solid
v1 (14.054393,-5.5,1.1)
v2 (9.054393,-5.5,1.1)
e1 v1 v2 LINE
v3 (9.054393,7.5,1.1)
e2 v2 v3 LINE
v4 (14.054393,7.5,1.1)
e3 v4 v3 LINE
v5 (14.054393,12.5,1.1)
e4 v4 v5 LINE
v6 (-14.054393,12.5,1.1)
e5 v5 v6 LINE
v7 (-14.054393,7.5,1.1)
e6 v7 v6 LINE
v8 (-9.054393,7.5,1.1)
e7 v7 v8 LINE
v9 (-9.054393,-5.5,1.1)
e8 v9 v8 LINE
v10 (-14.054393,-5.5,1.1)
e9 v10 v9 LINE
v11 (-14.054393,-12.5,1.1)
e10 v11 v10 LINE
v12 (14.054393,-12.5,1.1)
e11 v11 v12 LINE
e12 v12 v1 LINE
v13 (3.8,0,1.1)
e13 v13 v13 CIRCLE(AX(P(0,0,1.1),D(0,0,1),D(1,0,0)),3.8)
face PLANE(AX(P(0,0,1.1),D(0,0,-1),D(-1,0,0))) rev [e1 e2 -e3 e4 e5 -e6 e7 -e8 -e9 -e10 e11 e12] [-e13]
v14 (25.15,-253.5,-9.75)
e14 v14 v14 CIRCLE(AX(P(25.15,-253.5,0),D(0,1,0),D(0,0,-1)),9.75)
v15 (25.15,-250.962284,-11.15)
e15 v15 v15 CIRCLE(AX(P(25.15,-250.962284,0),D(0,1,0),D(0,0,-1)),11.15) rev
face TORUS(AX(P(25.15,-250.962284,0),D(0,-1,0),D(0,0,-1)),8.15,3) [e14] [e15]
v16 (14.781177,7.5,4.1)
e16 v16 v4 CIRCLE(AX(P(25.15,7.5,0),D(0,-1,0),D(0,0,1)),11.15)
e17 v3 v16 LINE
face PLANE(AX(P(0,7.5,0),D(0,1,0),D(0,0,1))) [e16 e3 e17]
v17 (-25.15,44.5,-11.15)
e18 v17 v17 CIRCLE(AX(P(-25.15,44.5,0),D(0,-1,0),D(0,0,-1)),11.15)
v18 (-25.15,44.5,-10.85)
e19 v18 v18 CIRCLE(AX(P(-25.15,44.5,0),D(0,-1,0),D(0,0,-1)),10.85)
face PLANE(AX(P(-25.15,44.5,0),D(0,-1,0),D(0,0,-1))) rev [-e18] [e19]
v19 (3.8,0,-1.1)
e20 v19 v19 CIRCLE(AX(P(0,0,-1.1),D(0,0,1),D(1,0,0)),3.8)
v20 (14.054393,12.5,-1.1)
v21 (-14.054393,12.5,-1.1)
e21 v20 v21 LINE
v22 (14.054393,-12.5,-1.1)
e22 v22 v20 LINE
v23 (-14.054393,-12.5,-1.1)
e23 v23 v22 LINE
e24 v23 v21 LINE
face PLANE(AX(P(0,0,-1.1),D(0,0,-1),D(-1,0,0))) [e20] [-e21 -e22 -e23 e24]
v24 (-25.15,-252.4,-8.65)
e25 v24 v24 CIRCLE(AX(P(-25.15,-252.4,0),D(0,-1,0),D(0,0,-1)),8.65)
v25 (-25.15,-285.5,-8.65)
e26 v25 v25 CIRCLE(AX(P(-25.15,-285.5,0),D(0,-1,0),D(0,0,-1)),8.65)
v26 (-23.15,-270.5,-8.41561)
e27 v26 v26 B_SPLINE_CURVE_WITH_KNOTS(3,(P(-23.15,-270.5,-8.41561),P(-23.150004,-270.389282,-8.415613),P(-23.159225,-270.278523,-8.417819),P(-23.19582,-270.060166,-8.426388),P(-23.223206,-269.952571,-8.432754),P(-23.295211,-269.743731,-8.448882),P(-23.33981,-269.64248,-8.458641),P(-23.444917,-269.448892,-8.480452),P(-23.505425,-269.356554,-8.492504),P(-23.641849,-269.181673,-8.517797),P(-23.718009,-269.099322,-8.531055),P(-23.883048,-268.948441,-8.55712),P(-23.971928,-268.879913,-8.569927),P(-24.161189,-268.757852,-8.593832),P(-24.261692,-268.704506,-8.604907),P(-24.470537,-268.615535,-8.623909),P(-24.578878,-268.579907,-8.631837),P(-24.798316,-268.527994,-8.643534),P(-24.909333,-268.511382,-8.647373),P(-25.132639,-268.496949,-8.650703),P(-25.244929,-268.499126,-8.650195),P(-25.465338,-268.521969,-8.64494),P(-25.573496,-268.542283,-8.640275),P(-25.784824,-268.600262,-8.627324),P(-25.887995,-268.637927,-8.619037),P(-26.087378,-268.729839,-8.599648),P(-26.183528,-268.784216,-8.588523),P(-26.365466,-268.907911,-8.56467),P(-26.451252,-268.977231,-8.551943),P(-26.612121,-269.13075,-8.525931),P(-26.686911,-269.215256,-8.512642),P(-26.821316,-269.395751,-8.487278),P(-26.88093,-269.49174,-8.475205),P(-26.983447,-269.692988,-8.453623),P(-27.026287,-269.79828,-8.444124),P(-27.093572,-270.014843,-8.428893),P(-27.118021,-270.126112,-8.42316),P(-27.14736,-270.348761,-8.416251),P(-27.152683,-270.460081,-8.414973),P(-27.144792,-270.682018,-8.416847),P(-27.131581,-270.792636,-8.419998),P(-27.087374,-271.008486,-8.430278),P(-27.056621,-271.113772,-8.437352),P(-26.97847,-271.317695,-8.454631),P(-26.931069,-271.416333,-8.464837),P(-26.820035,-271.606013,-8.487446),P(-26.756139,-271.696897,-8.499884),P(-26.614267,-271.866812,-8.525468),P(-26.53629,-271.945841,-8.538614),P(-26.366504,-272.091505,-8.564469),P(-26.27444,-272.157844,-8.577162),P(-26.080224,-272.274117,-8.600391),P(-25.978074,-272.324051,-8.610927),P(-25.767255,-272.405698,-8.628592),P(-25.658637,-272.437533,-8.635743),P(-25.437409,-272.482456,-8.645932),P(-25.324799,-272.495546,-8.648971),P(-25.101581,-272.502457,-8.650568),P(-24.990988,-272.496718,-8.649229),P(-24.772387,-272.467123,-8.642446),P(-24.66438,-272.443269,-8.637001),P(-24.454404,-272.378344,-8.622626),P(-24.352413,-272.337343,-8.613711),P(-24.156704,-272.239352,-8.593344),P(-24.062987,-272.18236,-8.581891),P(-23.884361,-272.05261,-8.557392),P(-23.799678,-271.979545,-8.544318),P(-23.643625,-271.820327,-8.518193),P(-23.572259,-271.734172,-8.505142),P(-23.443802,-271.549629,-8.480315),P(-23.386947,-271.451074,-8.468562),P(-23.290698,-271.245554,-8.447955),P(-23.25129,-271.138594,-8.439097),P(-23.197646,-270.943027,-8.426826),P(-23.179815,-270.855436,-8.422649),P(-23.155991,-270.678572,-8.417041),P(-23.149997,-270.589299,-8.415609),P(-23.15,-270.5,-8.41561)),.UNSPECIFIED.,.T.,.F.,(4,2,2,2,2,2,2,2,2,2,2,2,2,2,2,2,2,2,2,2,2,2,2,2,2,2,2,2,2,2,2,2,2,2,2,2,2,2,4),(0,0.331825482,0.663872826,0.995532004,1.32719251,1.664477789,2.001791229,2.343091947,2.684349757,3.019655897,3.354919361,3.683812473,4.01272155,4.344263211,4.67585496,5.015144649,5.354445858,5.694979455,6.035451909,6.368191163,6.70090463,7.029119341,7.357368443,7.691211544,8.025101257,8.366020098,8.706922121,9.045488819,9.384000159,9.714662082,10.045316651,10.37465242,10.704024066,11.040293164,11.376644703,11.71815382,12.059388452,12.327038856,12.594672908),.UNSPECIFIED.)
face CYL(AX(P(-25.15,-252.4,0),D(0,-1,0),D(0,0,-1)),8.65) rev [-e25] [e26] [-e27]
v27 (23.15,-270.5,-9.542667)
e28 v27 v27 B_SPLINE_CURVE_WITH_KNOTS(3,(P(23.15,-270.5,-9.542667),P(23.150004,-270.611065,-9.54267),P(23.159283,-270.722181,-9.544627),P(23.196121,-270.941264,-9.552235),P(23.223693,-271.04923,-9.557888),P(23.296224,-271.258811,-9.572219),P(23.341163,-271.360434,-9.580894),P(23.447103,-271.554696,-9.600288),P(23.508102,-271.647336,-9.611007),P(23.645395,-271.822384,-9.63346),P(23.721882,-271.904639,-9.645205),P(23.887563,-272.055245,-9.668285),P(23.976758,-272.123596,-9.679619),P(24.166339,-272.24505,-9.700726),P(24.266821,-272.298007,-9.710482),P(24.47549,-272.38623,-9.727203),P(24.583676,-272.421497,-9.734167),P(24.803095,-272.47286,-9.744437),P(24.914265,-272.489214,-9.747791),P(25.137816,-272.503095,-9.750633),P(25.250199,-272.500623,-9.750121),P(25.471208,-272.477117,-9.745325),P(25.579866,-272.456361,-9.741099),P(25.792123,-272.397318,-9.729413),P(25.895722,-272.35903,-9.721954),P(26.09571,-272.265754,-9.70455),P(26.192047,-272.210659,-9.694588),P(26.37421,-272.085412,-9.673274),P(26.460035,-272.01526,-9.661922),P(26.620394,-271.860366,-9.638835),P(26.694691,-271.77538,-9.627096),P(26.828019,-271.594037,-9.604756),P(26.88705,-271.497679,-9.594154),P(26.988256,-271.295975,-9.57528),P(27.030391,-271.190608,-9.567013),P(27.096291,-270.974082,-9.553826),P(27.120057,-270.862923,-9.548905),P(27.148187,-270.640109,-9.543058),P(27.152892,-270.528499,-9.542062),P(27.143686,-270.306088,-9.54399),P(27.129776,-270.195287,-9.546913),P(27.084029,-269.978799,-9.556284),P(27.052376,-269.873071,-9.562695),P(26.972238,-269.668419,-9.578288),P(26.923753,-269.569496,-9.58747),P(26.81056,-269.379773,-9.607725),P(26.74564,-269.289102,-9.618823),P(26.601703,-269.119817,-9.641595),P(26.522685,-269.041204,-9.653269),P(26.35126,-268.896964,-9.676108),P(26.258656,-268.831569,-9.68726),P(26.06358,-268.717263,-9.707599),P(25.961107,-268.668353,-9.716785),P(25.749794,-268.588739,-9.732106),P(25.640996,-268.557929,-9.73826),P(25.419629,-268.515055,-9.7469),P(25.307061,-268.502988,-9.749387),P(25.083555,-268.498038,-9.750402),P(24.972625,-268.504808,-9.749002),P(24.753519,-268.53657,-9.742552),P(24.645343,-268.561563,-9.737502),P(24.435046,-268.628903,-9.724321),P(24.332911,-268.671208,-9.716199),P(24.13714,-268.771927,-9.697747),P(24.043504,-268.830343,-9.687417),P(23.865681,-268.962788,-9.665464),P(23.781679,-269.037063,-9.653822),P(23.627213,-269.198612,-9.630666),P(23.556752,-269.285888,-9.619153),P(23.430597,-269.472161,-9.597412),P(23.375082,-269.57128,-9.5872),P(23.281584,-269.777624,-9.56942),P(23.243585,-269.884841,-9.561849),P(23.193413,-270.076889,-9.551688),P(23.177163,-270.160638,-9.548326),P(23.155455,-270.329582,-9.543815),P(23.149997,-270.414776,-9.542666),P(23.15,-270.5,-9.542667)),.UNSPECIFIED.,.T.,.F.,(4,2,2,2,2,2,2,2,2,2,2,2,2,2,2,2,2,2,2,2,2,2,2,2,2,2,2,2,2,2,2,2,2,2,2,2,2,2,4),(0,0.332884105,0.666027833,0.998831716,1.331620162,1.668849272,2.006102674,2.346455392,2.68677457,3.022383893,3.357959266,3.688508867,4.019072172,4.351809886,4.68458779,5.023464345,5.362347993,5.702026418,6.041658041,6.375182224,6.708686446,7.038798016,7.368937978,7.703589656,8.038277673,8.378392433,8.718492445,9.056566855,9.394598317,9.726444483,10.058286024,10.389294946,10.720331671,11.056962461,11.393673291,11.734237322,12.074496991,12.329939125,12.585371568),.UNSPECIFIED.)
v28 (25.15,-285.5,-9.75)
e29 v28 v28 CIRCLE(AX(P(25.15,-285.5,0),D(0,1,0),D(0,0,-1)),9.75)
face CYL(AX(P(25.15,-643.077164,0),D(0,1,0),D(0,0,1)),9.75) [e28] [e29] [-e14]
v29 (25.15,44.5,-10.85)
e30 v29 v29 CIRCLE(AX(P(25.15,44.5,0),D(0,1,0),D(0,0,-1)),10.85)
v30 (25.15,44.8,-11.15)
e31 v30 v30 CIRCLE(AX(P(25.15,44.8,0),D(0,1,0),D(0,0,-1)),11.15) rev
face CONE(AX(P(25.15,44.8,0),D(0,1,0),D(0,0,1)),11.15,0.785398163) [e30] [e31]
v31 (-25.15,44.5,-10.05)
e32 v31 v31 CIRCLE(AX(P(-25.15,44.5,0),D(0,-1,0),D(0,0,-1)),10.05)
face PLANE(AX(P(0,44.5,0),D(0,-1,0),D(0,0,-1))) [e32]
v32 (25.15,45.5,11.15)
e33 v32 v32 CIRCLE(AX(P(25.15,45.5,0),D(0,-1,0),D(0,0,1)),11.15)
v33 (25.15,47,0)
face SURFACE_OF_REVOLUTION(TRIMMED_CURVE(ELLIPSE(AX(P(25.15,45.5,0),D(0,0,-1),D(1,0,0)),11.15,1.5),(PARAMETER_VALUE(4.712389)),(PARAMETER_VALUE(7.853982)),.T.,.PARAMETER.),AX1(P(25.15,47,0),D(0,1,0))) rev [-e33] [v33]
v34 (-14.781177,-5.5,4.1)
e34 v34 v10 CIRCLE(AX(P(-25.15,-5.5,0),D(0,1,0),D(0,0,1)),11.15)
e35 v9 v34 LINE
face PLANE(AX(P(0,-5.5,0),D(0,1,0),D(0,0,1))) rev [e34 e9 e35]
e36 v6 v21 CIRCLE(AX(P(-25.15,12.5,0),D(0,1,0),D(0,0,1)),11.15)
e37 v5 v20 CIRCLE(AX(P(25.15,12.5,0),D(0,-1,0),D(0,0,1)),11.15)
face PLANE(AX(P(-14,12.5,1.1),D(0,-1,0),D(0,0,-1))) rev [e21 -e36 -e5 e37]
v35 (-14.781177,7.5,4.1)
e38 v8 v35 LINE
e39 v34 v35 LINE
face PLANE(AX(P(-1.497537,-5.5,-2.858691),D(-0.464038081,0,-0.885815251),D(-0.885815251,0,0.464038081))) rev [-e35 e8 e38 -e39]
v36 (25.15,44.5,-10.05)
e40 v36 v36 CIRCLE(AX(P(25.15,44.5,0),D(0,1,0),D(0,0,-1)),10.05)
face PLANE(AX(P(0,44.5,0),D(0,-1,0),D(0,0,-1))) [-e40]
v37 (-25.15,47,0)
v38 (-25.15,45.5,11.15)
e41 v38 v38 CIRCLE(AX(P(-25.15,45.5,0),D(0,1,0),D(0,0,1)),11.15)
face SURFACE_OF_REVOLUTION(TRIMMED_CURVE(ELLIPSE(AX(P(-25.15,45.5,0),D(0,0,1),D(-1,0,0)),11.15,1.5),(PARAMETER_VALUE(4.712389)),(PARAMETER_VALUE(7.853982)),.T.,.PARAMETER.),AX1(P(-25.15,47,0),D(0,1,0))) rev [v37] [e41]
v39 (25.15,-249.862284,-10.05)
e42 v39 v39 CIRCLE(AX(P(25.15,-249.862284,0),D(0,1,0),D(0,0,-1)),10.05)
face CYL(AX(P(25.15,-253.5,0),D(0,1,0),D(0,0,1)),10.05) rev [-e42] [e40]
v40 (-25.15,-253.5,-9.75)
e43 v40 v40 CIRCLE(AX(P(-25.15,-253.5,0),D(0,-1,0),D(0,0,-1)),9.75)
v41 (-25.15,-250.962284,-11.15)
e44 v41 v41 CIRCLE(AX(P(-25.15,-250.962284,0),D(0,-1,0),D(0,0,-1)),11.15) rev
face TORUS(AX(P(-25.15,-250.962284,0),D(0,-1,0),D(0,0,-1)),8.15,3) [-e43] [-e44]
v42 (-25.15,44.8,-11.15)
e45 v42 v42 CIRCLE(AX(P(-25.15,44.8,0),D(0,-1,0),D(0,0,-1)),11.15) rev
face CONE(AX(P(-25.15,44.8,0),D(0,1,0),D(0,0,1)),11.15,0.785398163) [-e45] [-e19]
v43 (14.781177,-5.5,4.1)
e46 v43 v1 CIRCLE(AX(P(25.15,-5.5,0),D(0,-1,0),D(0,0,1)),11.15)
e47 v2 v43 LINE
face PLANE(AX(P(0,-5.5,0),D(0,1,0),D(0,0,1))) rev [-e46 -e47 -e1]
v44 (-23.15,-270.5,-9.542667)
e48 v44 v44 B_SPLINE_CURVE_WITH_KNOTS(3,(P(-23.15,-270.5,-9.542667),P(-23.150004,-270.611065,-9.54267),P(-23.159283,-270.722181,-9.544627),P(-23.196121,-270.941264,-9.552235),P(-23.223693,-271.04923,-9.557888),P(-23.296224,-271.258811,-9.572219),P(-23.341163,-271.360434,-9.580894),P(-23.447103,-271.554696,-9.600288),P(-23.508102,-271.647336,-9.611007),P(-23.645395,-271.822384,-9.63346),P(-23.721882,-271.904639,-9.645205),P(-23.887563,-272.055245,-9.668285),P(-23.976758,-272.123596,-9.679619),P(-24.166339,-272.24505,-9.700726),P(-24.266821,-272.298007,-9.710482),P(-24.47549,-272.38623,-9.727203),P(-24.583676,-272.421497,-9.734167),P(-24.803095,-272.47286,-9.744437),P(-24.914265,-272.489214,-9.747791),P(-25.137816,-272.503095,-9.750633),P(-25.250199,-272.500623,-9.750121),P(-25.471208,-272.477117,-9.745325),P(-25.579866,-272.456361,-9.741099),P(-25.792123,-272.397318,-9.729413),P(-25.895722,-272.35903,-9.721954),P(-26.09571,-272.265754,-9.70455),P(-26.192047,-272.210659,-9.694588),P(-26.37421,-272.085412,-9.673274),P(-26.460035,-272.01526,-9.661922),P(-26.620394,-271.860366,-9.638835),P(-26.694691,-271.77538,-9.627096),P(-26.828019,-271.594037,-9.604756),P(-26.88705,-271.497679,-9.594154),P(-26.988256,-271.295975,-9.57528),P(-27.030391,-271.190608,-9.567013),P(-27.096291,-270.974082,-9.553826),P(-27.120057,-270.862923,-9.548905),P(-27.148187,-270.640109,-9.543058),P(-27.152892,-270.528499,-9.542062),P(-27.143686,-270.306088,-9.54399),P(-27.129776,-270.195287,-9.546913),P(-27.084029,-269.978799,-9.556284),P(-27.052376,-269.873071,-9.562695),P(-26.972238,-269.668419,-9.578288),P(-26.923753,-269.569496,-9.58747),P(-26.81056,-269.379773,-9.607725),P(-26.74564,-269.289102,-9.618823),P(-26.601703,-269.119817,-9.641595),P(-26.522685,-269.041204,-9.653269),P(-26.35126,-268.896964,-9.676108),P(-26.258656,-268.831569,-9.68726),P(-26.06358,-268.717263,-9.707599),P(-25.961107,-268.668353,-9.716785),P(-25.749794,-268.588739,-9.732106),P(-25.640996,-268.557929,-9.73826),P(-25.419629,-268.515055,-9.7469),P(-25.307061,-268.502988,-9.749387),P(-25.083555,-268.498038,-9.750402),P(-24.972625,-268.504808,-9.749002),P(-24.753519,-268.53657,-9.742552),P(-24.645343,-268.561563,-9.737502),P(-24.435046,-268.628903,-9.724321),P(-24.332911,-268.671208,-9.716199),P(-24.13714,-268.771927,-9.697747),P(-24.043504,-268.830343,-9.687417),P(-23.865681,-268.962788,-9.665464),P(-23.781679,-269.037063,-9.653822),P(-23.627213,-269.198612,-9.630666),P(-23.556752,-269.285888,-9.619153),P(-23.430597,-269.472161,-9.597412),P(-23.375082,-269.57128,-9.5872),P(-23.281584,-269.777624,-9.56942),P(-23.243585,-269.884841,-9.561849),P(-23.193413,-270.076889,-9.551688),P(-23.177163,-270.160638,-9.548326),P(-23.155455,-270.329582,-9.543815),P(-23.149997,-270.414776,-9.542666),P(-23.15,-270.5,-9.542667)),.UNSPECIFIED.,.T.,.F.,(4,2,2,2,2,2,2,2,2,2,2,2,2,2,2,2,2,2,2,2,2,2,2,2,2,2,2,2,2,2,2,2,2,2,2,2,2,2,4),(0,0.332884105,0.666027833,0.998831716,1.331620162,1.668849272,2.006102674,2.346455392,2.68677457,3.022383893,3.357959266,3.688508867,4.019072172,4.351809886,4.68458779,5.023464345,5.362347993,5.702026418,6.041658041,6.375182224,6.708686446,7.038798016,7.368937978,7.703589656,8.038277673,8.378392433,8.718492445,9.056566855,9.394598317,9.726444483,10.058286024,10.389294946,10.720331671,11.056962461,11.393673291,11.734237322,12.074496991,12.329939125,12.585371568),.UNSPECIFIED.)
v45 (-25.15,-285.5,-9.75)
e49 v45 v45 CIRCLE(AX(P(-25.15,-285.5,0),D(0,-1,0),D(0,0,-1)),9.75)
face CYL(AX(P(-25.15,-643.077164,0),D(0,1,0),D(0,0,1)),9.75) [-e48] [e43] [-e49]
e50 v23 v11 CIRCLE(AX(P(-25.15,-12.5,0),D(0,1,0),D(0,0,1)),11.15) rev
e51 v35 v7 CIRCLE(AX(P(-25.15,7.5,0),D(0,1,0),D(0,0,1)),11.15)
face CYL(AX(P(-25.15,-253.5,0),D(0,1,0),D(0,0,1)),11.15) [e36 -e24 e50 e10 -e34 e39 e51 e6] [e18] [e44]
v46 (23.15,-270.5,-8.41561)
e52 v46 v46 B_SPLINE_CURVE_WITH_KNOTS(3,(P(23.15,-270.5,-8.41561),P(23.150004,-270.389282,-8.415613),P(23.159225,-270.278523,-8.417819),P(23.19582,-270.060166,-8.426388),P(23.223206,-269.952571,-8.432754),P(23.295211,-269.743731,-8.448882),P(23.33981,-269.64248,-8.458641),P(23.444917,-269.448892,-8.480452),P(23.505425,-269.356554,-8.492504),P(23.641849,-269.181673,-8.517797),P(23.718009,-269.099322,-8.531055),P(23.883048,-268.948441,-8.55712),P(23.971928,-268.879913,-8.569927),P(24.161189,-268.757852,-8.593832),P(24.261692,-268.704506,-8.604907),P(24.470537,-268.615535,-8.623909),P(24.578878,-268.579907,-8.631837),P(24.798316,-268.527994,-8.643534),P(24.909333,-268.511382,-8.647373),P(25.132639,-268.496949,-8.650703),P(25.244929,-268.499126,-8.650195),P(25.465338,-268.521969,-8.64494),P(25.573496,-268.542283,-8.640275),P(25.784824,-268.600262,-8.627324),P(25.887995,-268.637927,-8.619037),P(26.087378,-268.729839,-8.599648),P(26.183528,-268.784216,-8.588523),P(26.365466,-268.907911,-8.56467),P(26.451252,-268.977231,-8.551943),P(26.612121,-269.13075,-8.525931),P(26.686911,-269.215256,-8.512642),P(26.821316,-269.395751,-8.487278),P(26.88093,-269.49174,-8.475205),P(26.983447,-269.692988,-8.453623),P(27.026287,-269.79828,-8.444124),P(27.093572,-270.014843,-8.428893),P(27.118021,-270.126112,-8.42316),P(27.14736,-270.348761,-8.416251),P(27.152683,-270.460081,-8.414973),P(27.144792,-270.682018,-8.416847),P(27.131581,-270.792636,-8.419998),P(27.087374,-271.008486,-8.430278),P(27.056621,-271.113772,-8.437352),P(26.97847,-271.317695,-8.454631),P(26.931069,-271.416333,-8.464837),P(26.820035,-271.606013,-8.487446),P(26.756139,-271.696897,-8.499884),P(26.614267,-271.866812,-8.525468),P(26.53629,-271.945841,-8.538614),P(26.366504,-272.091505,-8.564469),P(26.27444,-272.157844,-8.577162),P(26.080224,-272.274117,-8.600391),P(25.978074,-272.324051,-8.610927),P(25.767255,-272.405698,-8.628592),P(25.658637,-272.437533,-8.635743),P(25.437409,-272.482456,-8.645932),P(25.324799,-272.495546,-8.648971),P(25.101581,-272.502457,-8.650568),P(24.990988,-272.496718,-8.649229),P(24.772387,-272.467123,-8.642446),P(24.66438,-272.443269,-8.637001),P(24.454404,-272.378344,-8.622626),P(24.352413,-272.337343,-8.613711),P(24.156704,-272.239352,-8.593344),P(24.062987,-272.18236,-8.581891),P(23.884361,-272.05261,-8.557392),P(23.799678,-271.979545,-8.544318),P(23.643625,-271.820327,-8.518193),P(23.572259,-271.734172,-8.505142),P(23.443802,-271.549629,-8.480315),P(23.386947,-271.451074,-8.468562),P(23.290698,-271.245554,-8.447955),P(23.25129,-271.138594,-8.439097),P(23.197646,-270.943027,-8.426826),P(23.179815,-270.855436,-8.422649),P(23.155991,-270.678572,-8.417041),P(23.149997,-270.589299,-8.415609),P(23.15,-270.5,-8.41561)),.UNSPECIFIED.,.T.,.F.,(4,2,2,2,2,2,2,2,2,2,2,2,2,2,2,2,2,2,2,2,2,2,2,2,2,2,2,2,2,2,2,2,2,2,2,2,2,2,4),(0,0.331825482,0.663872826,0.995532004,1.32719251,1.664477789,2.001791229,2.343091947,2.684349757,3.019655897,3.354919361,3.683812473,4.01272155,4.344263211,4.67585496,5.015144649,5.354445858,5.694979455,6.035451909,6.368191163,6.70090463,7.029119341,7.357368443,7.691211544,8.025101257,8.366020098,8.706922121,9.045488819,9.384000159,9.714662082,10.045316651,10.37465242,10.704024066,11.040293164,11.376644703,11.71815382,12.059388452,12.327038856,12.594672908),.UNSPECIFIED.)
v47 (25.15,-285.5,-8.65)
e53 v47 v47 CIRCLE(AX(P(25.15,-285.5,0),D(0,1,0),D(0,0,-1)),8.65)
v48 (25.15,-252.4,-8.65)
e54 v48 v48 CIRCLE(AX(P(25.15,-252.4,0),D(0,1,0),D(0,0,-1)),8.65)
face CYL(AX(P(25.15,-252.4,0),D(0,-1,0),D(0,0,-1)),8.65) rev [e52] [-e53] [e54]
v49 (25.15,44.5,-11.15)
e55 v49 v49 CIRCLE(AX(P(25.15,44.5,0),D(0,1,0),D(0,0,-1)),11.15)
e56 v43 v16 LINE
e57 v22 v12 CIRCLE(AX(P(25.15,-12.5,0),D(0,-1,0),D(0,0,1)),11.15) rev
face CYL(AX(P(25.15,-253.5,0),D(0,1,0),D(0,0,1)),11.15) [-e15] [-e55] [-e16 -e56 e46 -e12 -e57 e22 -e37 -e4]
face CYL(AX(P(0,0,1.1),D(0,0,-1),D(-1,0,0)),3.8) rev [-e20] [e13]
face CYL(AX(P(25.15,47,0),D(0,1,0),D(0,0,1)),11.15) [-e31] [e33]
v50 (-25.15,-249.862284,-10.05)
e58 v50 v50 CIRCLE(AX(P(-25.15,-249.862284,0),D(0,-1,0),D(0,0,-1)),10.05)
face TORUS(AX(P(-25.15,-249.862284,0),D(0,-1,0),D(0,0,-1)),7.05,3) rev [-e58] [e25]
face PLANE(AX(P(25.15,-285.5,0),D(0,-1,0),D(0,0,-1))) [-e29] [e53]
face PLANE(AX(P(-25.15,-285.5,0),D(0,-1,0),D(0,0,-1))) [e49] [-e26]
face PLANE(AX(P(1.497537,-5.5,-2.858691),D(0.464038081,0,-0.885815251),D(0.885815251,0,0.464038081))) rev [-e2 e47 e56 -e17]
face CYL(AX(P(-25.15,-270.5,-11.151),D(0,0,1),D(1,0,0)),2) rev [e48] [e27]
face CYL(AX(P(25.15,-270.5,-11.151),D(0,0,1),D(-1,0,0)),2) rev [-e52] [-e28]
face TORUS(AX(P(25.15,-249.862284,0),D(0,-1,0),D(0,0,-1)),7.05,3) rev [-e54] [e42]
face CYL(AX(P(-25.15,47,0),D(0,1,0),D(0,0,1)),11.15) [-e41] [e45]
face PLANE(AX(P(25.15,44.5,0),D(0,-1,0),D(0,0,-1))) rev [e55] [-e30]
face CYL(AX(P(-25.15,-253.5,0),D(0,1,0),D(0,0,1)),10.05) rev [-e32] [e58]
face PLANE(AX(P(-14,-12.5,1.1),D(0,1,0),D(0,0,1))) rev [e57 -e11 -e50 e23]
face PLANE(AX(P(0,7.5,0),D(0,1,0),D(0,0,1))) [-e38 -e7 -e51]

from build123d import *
from build123d.topology import SkipClean

# Parameters (mm, degrees)
SKETCH1_W                = 28
SKETCH1_H                = 25
SKETCH1_R                = 3.8
BOSS_EXTRUDE1_DEPTH      = 1.1
BOSS_EXTRUDE2_DEPTH      = 241
BOSS_EXTRUDE2_DEPTH_BACK = 57
SKETCH2_R                = 11.15
SKETCH2_R_2              = 10.05
SKETCH3_R                = 11.15
SKETCH3_R_2              = 8.65
BOSS_EXTRUDE3_DEPTH      = 1.1
SKETCH4_R                = 9.75
SKETCH4_R_2              = 8.65
BOSS_EXTRUDE4_DEPTH      = 32
FILLET1_R                = 3
CUT_EXTRUDE1_REACH       = 290.014
CUT_EXTRUDE1_END_RADIUS  = 9.75
SKETCH8_R                = 2
CHAMFER1_SIZE            = 0.3
BOSS_EXTRUDE5_DEPTH      = 25
BOSS_EXTRUDE5_2_DEPTH    = 25
BOSS_EXTRUDE6_START      = -5
BOSS_EXTRUDE6_DEPTH      = 13


with BuildPart() as part:
    # Sketch1 → Boss-Extrude1 (new, symmetric)
    with BuildSketch(Plane.XY):
        Rectangle(SKETCH1_W, SKETCH1_H)
        Circle(SKETCH1_R, mode=Mode.SUBTRACT)
    extrude(amount=BOSS_EXTRUDE1_DEPTH, both=True)


with BuildPart() as body_2:
    # Sketch2 → Boss-Extrude2 (new, two sides: drawn at the far end of the back side and taken through both)
    with BuildSketch(Plane.XZ.offset(12.5).offset(-BOSS_EXTRUDE2_DEPTH_BACK)):
        with Locations(Location((-25.15, 0, 0), (0, 0, 270))):
            Circle(SKETCH2_R)
        with Locations(Location((-25.15, 0, 0), (0, 0, 270))):
            Circle(SKETCH2_R_2, mode=Mode.SUBTRACT)
    extrude(amount=BOSS_EXTRUDE2_DEPTH + BOSS_EXTRUDE2_DEPTH_BACK)

    # Sketch3 → Boss-Extrude3 (add)
    with BuildSketch(Plane.XZ.offset(253.5)):
        with Locations(Location((-25.15, 0, 0), (0, 0, 270))):
            Circle(SKETCH3_R)
        with Locations(Location((-25.15, 0, 0), (0, 0, 270))):
            Circle(SKETCH3_R_2, mode=Mode.SUBTRACT)
    extrude(amount=-BOSS_EXTRUDE3_DEPTH)

    # Sketch4 → Boss-Extrude4 (add)
    with SkipClean():  # the faces are left unmerged after this step: merging them gives an invalid solid
        with BuildSketch(Plane.XZ.offset(253.5)):
            with Locations(Location((-25.15, 0, 0), (0, 0, 270))):
                Circle(SKETCH4_R)
            with Locations(Location((-25.15, 0, 0), (0, 0, 270))):
                Circle(SKETCH4_R_2, mode=Mode.SUBTRACT)
        extrude(amount=BOSS_EXTRUDE4_DEPTH)

    # Fillet1
    # the kernel refuses this fillet: 3 mm, written as the material it adds along each edge
    with BuildSketch(Plane(origin=(-25.15, -252.4, 0), x_dir=(0, 0, -1), z_dir=(1, 0, 0))) as fillet1_piece_1:
        with BuildLine():
            CenterArc((7.05, 2.537715508), FILLET1_R, 302.230952635, 57.769047365)
            Line((8.65, 0), (8.682, -0.05075431))
            ThreePointArc((8.682, -0.05075431), (9.35, -0.06), (10.05, -0.06))
            Line((10.05, -0.06), (10.11, 0))
            Line((10.11, 0), (10.11, 2.537715508))
            Line((10.11, 2.537715508), (10.05, 2.537715508))
        make_face()
    revolve(axis=Axis((-25.15, -252.4, 0), (0, 1, 0)))
    # the kernel refuses this fillet: 3 mm, written as the material it takes off along each edge
    with BuildSketch(Plane(origin=(-25.15, -253.5, 0), x_dir=(0, 0, -1), z_dir=(-1, 0, 0))) as fillet1_2_piece_1:
        with BuildLine():
            CenterArc((8.15, -2.537715508), FILLET1_R, 0, 57.769047365)
            Line((9.75, 0), (9.782, 0.05075431))
            ThreePointArc((9.782, 0.05075431), (10.45, 0.06), (11.15, 0.06))
            Line((11.15, 0.06), (11.21, 0))
            Line((11.21, 0), (11.21, -2.537715508))
            Line((11.21, -2.537715508), (11.15, -2.537715508))
        make_face()
    revolve(axis=Axis((-25.15, -253.5, 0), (0, -1, 0)), mode=Mode.SUBTRACT)

    # Cut-Extrude1: up to this cylinder (the profile starts inside it)
    cut_extrude1_end = Plane(origin=(-25.15, -270.5, 0), z_dir=(0, 1, 0)) * Cylinder(CUT_EXTRUDE1_END_RADIUS, 600.528, mode=Mode.PRIVATE)
    # Sketch8 → Cut-Extrude1 (cut, up to the surface)
    with BuildSketch(Plane.XY, mode=Mode.PRIVATE) as cut_extrude1_sk1:
        with Locations((-25.15, -270.5)):
            Circle(SKETCH8_R)
    cut_extrude1_tool1 = extrude(cut_extrude1_sk1.sketch, amount=-CUT_EXTRUDE1_REACH, mode=Mode.PRIVATE) & cut_extrude1_end
    add(cut_extrude1_tool1.solids().sort_by_distance((-25.15, -270.5, 0))[0], mode=Mode.SUBTRACT)


with BuildPart() as body_3:
    # Sketch5 → Revolve1 (revolve)
    with SkipClean():  # the faces are left unmerged after this step: merging them gives an invalid solid
        with BuildSketch(Plane.XY, mode=Mode.PRIVATE) as revolve1_sk:
            with BuildLine():
                add(Edge.make_bspline(
                    [(-14, 45.5), (-14, 47), (-25.15, 47)],
                    knots=[3.141592654, 3.141592654, 3.141592654, 4.71238898, 4.71238898, 4.71238898], degree=2, weights=[1, 0.707106781, 1]))
                Line((-25.15, 47), (-25.15, 45.5))
                Line((-25.15, 45.5), (-14, 45.5))
            make_face()
            with BuildLine():
                Line((-25.15, 45.5), (-25.15, 47))
                add(Edge.make_bspline(
                    [(-25.15, 47), (-36.3, 47), (-36.3, 45.5)],
                    knots=[4.71238898, 4.71238898, 4.71238898, 6.283185307, 6.283185307, 6.283185307], degree=2, weights=[1, 0.707106781, 1]))
                Line((-36.3, 45.5), (-25.15, 45.5))
            make_face()
            with BuildLine():
                Line((-14, 45.5), (-25.15, 45.5))
                Line((-25.15, 45.5), (-25.15, 44.5))
                Line((-25.15, 44.5), (-16.839280684, 44.5))
                add(Edge.make_bspline(
                    [(-16.839280684, 44.5), (-14, 44.927050983), (-14, 45.5)],
                    knots=[2.411864997, 2.411864997, 2.411864997, 3.141592654, 3.141592654, 3.141592654], degree=2, weights=[1, 0.934172359, 1]))
            make_face()
            with BuildLine():
                Line((-25.15, 44.5), (-25.15, 45.5))
                Line((-25.15, 45.5), (-36.3, 45.5))
                add(Edge.make_bspline(
                    [(-36.3, 45.5), (-36.3, 44.927050983), (-33.460719316, 44.5)],
                    knots=[0, 0, 0, 0.729727656, 0.729727656, 0.729727656], degree=2, weights=[1, 0.934172359, 1]))
                Line((-33.460719316, 44.5), (-25.15, 44.5))
            make_face()
            with BuildLine():
                add(Edge.make_bspline(
                    [(-36.3, 45.5), (-36.3, 44.927050983), (-33.460719316, 44.5)],
                    knots=[0, 0, 0, 0.729727656, 0.729727656, 0.729727656], degree=2, weights=[1, 0.934172359, 1]))
                Line((-36.3, 45.5), (-36.3, 44.5))
                Line((-36.3, 44.5), (-33.460719316, 44.5))
            make_face()
        revolve(revolve1_sk.sketch.rotate(Axis((-25.15, 47, 0), (0, -1, 0)), 270), axis=Axis((-25.15, 47, 0), (0, -1, 0)))
    add(body_3.part.scale(1), mode=Mode.REPLACE)  # the faces are merged on a copy

    # Chamfer1
    chamfer1_edges = [body_3.edges().sort_by_distance(p)[0] for p in [
        (-25.15, 44.5, -11.15),
    ]]
    chamfer(chamfer1_edges, length=CHAMFER1_SIZE)


with BuildPart() as body_4:
    # Sketch6 → Boss-Extrude5 (new body)
    with BuildSketch(Plane(origin=(0, 12.5, 0), x_dir=(1, 0, 0), z_dir=(0, 1, 0))):
        with BuildLine():
            Line((-14, 0), (-14, 1.1))
            Line((-14, 1.1), (-14.054392761, 1.1))
            ThreePointArc((-14.054392761, 1.1), (-14.013606492, 0.550671992), (-14, 0))
        make_face()
    extrude(amount=-BOSS_EXTRUDE5_DEPTH)


with BuildPart() as body_5:
    # Sketch6 → Boss-Extrude5 2 (new body)
    with BuildSketch(Plane(origin=(0, 12.5, 0), x_dir=(1, 0, 0), z_dir=(0, 1, 0))):
        with BuildLine():
            Line((-14, -1.1), (-14, 0))
            ThreePointArc((-14, 0), (-14.013606492, -0.550671992), (-14.054392761, -1.1))
            Line((-14.054392761, -1.1), (-14, -1.1))
        make_face()
    extrude(amount=-BOSS_EXTRUDE5_2_DEPTH)


with BuildPart() as body_6:
    # Sketch7 → Boss-Extrude6 (new body)
    with BuildSketch(Plane(origin=(0, 12.5, 0), x_dir=(1, 0, 0), z_dir=(0, 1, 0)).offset(BOSS_EXTRUDE6_START)):
        with BuildLine():
            Line((-14.781176537, -4.1), (-9.054392761, -1.1))
            Line((-9.054392761, -1.1), (-14, -1.1))
            Line((-14, -1.1), (-14.054392761, -1.1))
            ThreePointArc((-14.054392761, -1.1), (-14.313467052, -2.625272112), (-14.781176537, -4.1))
        make_face()
    extrude(amount=-BOSS_EXTRUDE6_DEPTH)


with BuildPart() as body_7:
    # Mirror1: mirrored copy
    add(body_2.part.mirror(Plane(origin=(0, 0, 0), x_dir=(0, 0, 1), z_dir=(1, 0, 0))))


with BuildPart() as body_8:
    # Mirror1 2: mirrored copy
    add(body_3.part.mirror(Plane(origin=(0, 0, 0), x_dir=(0, 0, 1), z_dir=(1, 0, 0))))


with BuildPart() as body_9:
    # Mirror1 3: mirrored copy
    add(body_4.part.mirror(Plane(origin=(0, 0, 0), x_dir=(0, 0, 1), z_dir=(1, 0, 0))))


with BuildPart() as body_10:
    # Mirror1 4: mirrored copy
    add(body_5.part.mirror(Plane(origin=(0, 0, 0), x_dir=(0, 0, 1), z_dir=(1, 0, 0))))


with BuildPart() as body_11:
    # Mirror1 5: mirrored copy
    add(body_6.part.mirror(Plane(origin=(0, 0, 0), x_dir=(0, 0, 1), z_dir=(1, 0, 0))))


with BuildPart() as part_1:
    add(part.part)

    # Combine1: union body 2, body 3, body 4, body 5, body 6, body 7, body 8, body 9, body 10, body 11
    add(body_2.part)
    add(body_3.part)
    add(body_4.part)
    add(body_5.part)
    add(body_6.part)
    add(body_7.part)
    add(body_8.part)
    add(body_9.part)
    add(body_10.part)
    add(body_11.part)


solid = part_1.part
